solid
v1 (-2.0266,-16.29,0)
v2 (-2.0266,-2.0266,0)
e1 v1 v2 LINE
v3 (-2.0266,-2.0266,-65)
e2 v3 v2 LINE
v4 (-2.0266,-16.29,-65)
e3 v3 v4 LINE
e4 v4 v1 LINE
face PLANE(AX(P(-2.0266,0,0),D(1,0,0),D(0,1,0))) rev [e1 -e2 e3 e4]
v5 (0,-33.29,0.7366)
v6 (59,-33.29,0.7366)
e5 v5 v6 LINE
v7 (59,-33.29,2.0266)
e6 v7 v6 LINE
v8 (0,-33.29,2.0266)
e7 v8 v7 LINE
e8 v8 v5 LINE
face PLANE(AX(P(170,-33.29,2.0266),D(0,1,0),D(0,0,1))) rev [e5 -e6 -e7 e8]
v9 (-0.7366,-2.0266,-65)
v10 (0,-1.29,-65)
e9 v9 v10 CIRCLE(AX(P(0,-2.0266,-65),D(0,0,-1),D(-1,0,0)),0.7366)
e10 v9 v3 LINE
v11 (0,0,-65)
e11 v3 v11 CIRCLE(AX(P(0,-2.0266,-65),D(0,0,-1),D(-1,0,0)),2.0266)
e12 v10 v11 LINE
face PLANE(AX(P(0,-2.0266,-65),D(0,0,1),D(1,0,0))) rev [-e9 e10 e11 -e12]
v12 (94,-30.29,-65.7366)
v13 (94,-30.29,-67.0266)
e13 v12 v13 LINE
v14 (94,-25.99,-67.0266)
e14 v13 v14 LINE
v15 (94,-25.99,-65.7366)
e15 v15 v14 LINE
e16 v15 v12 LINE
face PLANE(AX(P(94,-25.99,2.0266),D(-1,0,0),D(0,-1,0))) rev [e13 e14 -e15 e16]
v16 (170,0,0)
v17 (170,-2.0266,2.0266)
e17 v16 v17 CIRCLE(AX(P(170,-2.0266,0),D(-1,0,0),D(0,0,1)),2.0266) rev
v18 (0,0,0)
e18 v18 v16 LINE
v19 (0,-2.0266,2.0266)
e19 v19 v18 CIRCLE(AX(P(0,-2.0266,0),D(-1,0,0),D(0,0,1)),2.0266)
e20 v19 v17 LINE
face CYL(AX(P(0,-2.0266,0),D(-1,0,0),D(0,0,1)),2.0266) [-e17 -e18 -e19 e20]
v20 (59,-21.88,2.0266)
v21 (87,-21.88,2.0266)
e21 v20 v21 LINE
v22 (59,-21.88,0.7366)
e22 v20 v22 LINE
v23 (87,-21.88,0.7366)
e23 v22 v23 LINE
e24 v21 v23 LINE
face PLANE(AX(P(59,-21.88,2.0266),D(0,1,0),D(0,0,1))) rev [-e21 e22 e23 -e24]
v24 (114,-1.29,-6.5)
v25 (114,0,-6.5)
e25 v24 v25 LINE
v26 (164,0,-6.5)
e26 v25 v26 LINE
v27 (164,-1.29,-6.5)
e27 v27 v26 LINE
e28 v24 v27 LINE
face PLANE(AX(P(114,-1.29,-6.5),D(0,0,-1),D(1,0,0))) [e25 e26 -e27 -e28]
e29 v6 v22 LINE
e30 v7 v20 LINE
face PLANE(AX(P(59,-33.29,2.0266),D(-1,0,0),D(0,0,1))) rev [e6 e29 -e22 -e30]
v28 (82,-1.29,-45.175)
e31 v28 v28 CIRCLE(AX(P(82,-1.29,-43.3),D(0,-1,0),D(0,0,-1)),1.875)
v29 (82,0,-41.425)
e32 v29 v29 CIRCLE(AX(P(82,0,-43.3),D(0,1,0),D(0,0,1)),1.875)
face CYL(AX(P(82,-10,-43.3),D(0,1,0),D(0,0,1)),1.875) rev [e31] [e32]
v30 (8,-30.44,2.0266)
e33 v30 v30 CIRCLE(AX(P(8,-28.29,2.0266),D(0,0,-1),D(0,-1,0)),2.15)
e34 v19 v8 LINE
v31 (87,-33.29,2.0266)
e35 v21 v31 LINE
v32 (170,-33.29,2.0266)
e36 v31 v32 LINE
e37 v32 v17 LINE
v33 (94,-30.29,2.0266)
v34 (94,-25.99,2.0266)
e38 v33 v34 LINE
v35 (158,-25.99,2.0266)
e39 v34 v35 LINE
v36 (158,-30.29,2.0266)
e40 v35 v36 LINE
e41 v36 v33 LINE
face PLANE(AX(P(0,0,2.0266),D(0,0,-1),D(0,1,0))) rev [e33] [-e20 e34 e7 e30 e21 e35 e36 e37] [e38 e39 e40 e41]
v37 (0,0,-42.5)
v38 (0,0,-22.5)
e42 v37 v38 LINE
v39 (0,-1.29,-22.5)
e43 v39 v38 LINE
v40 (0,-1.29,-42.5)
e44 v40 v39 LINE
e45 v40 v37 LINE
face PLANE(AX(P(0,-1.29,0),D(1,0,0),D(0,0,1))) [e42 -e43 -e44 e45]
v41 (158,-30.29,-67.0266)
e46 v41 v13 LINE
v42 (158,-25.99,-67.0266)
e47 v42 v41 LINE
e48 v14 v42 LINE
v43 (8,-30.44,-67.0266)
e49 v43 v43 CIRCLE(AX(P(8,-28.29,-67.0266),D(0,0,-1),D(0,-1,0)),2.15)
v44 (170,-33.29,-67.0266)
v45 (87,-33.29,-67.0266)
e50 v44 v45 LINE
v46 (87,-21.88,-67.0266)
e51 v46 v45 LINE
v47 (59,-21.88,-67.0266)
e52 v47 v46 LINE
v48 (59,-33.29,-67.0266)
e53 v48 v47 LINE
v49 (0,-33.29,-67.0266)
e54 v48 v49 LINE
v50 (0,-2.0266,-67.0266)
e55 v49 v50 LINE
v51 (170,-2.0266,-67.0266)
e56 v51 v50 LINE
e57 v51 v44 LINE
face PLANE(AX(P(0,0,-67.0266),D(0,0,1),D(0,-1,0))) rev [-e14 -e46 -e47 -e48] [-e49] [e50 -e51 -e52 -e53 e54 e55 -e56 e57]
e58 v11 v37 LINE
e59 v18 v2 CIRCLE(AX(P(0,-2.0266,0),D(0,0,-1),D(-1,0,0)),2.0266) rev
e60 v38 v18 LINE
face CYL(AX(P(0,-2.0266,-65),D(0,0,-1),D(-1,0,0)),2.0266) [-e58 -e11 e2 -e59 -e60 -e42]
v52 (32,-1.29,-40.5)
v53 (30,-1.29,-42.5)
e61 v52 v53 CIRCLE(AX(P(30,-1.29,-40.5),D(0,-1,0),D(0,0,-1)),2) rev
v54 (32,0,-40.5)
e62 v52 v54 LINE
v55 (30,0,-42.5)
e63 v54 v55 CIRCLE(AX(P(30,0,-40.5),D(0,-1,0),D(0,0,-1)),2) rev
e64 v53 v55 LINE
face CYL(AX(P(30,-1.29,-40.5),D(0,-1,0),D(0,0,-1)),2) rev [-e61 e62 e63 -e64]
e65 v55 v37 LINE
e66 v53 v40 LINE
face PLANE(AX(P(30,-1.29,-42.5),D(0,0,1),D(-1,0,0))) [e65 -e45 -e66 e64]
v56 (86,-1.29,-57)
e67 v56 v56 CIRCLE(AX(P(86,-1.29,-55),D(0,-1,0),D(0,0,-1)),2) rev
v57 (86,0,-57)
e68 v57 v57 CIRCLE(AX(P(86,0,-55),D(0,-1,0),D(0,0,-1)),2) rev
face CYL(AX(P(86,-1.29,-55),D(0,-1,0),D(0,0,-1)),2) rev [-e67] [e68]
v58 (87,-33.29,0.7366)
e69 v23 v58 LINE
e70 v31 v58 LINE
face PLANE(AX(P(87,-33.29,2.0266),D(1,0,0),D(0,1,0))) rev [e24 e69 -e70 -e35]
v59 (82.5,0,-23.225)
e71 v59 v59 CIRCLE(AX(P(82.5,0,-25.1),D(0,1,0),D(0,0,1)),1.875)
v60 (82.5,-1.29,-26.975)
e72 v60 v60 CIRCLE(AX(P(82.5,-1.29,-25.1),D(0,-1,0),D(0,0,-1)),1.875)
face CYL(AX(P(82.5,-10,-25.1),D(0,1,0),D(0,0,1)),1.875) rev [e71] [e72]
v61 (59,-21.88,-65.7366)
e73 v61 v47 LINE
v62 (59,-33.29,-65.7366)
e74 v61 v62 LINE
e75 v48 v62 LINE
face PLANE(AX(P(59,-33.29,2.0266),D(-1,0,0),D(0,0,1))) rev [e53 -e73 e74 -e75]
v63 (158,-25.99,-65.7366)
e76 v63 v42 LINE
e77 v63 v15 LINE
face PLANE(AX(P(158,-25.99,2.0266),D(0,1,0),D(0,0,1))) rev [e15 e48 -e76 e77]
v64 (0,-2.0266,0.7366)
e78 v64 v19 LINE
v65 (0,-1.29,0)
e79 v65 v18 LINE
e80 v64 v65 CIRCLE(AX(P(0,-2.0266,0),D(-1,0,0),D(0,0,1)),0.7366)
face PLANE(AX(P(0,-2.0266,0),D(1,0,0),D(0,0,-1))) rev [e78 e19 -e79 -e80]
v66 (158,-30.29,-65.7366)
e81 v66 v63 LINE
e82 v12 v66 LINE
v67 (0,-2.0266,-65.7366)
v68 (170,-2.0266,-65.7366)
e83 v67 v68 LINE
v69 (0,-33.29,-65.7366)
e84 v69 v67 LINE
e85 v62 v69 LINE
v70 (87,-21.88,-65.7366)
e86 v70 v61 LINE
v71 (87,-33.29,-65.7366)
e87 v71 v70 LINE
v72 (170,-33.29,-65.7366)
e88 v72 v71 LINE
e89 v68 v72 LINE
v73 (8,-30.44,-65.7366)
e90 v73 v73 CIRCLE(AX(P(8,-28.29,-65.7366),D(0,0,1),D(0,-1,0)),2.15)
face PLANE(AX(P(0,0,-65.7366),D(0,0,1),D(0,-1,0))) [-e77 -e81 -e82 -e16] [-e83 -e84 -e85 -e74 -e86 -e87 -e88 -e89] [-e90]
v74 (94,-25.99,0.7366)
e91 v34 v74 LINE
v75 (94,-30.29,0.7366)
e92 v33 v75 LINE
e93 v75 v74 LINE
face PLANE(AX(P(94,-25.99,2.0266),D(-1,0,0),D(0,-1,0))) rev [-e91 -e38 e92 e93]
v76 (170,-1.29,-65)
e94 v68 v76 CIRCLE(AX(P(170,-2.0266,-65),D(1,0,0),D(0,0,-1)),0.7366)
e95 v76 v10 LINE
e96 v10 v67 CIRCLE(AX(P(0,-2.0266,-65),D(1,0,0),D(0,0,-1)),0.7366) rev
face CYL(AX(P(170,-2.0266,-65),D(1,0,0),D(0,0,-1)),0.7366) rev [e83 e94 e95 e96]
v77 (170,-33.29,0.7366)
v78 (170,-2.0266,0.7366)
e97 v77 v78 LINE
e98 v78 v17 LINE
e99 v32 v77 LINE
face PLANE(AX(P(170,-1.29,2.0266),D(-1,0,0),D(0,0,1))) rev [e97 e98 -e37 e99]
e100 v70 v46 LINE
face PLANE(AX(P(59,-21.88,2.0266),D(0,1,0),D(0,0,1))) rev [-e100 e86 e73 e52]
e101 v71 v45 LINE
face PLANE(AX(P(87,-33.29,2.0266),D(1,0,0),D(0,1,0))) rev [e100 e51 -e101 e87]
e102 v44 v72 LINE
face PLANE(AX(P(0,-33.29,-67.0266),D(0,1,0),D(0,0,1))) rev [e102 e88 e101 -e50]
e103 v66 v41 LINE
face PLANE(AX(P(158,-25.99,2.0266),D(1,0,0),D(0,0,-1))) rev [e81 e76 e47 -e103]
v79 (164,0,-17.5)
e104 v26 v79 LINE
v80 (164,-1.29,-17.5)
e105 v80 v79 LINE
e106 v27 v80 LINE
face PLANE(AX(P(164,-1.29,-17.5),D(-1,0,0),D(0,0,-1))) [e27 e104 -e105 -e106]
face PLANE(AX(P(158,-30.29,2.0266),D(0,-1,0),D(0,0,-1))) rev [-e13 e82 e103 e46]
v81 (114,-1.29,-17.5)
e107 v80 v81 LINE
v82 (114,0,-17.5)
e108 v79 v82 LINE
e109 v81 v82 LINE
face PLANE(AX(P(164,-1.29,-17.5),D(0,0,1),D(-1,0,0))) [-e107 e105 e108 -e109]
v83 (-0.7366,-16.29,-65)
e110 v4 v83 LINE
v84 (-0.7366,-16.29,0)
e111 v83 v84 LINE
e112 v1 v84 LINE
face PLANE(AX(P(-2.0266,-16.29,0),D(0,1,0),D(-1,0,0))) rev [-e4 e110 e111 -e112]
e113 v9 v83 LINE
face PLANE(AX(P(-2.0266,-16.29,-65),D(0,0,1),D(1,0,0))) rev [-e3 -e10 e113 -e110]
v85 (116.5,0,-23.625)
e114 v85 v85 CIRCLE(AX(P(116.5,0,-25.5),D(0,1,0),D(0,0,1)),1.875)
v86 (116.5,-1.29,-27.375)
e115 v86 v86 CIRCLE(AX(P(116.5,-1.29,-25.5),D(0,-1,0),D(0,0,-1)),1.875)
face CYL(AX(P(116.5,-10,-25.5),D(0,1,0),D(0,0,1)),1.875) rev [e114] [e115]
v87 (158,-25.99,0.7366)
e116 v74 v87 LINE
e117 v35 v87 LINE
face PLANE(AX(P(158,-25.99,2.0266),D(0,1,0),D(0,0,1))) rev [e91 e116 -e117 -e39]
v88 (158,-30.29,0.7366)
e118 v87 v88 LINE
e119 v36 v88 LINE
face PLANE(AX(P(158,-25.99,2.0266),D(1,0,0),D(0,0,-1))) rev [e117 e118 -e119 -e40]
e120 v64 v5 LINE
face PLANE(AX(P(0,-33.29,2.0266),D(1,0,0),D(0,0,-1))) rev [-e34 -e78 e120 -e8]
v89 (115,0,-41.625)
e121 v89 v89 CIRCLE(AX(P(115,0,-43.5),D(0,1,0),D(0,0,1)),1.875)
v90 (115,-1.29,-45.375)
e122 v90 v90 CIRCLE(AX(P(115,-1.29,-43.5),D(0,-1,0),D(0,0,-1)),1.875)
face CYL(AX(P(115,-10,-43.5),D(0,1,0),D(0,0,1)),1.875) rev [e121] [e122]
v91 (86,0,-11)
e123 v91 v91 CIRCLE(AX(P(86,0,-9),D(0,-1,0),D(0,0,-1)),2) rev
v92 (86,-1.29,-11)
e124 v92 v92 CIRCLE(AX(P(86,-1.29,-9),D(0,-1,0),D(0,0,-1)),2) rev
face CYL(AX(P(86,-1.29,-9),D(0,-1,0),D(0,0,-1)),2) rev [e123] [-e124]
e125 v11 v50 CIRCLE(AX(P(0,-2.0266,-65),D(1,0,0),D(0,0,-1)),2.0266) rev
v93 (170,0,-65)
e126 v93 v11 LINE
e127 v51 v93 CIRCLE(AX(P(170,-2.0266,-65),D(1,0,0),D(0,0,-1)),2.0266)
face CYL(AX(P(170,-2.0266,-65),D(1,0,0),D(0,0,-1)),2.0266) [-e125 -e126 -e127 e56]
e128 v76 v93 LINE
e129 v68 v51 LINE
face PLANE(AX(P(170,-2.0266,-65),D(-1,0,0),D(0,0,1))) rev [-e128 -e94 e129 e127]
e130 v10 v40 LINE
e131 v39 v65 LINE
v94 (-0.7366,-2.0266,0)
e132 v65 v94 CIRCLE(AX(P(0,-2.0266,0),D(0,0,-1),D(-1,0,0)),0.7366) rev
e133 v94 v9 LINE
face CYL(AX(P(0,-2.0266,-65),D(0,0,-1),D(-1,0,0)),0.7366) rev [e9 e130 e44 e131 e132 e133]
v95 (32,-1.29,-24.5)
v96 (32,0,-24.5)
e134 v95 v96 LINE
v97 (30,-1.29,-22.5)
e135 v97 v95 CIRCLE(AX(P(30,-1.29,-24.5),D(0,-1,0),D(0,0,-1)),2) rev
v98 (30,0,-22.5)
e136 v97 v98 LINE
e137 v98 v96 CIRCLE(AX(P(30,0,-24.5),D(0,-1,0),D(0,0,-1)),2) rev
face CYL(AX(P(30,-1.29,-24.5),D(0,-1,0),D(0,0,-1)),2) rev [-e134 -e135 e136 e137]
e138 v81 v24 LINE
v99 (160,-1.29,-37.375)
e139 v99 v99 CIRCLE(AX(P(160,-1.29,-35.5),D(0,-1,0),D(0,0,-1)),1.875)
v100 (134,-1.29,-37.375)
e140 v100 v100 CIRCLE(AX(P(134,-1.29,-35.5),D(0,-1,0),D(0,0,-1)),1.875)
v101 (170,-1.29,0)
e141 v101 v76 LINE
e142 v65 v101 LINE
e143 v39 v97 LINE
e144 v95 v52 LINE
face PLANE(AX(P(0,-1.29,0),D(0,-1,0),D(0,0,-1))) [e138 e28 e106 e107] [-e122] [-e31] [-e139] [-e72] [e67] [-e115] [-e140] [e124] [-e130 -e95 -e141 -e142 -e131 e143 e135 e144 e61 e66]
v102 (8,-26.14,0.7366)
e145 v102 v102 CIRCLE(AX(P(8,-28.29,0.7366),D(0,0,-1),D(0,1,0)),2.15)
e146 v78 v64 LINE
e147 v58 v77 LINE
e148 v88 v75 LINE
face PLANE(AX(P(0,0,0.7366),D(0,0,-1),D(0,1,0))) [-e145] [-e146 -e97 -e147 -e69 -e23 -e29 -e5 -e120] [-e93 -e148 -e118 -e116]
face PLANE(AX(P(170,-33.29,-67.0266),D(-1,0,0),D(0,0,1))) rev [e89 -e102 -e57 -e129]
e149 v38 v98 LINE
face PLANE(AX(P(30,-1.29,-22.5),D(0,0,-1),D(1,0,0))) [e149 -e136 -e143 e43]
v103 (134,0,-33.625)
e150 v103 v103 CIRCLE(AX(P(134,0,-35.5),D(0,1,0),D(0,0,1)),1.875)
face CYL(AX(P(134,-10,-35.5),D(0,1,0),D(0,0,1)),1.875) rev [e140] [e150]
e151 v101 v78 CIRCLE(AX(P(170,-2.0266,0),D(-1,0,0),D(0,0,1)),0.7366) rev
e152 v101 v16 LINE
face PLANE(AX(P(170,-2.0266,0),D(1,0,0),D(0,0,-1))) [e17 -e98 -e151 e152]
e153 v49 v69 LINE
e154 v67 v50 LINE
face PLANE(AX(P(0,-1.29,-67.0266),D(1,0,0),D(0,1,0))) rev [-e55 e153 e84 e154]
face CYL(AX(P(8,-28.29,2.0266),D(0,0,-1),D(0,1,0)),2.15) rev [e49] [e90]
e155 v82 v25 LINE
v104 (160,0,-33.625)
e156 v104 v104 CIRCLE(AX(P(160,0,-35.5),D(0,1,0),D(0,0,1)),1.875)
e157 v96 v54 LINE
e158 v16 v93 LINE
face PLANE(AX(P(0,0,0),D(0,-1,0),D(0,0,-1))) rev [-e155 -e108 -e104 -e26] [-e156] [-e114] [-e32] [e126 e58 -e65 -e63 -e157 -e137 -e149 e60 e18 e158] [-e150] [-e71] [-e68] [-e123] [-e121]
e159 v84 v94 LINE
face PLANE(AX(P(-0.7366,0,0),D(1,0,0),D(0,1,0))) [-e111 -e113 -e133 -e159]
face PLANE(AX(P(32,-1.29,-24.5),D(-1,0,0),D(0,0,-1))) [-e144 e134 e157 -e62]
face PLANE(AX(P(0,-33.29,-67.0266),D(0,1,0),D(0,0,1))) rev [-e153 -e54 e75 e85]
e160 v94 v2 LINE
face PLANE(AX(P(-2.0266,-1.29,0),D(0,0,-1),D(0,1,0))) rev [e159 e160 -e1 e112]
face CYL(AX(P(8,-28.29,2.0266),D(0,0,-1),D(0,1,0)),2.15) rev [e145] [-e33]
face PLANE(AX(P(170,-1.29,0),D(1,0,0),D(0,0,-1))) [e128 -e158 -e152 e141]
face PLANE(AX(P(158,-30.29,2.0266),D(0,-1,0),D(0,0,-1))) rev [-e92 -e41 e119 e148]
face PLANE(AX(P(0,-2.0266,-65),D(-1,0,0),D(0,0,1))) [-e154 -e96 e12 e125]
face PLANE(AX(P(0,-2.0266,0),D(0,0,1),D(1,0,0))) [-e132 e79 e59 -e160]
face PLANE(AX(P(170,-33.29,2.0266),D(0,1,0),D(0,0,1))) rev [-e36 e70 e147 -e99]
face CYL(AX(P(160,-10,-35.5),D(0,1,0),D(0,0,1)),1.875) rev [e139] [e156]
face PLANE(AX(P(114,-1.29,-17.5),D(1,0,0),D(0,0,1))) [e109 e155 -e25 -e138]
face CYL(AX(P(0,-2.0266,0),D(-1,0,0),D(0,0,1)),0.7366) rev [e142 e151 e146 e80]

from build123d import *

# Parameters (mm, degrees)
SKETCH1_W          = 170
SKETCH1_H          = 65
BASE_FLANGE1_DEPTH = 1.29
EDGE_FLANGE1_DEPTH = 170
EDGE_FLANGE3_DEPTH = 65
CUT_EXTRUDE1_REACH = 187.022
SKETCH16_R         = 2
SKETCH16_W         = 50
SKETCH16_H         = 11
EDGE_FLANGE7_DEPTH = 170
SKETCH34_R         = 2.15
SKETCH34_W         = 28
SKETCH34_H         = 11.41
SKETCH34_W_2       = 64
SKETCH34_H_2       = 4.3
CUT_EXTRUDE5_DEPTH = 187.484767556
SKETCH36_R         = 1.875
CUT_EXTRUDE6_DEPTH = 10
SKETCH37_R         = 1.875
CUT_EXTRUDE7_DEPTH = 10


# Sheet-metal steps are written as plain solids
with BuildPart() as part:
    # Sketch1 → Base-Flange1 (new body)
    with BuildSketch(Plane(origin=(0, 0, 0), x_dir=(1, 0, 0), z_dir=(0, 1, 0))):
        with Locations((85, 32.5)):
            Rectangle(SKETCH1_W, SKETCH1_H)
    extrude(amount=-BASE_FLANGE1_DEPTH)

    # Edge-Flange1 section (across the edge) → Edge-Flange1 (add)
    with BuildSketch(Plane(origin=(170, -1.29, 0.7366), x_dir=(0, 0, -1), z_dir=(-1, 0, 0))):
        with BuildLine():
            Line((-1.29, 0.7366), (-1.29, 32))
            Line((-1.29, 32), (0, 32))
            Line((0, 32), (0, 0.7366))
            ThreePointArc((0, 0.7366), (0.215745145, 0.215745145), (0.7366, 0))
            Line((0.7366, 0), (0.7366, -1.29))
            ThreePointArc((0.7366, -1.29), (-0.696422603, -0.696422603), (-1.29, 0.7366))
        make_face()
    extrude(amount=EDGE_FLANGE1_DEPTH)

    # Edge-Flange3 section (across the edge) → Edge-Flange3 (add)
    with BuildSketch(Plane(origin=(-0.7366, -1.29, 0), x_dir=(1, 0, 0), z_dir=(0, 0, -1))):
        with BuildLine():
            Line((-1.29, 0.7366), (-1.29, 15))
            Line((-1.29, 15), (0, 15))
            Line((0, 15), (0, 0.7366))
            ThreePointArc((0, 0.7366), (0.215745145, 0.215745145), (0.7366, 0))
            Line((0.7366, 0), (0.7366, -1.29))
            ThreePointArc((0.7366, -1.29), (-0.696422603, -0.696422603), (-1.29, 0.7366))
        make_face()
    extrude(amount=EDGE_FLANGE3_DEPTH)

    # Sketch16 → Cut-Extrude1 (cut, up to next)
    with BuildSketch(Plane(origin=(0, 0, 0), x_dir=(1, 0, 0), z_dir=(0, 1, 0)), mode=Mode.PRIVATE) as cut_extrude1_sk1:
        with Locations(Location((86, 9, 0), (0, 0, 90))):
            Circle(SKETCH16_R)
    cut_extrude1_tool1 = extrude(cut_extrude1_sk1.sketch, amount=-CUT_EXTRUDE1_REACH, mode=Mode.PRIVATE) & part.part
    # Sketch16 → Cut-Extrude1 (cut, up to next)
    with BuildSketch(Plane(origin=(0, 0, 0), x_dir=(1, 0, 0), z_dir=(0, 1, 0)), mode=Mode.PRIVATE) as cut_extrude1_sk2:
        with Locations(Location((86, 55, 0), (0, 0, 90))):
            Circle(SKETCH16_R)
    cut_extrude1_tool2 = extrude(cut_extrude1_sk2.sketch, amount=-CUT_EXTRUDE1_REACH, mode=Mode.PRIVATE) & part.part
    # Sketch16 → Cut-Extrude1 (cut, up to next)
    with BuildSketch(Plane(origin=(0, 0, 0), x_dir=(1, 0, 0), z_dir=(0, 1, 0)), mode=Mode.PRIVATE) as cut_extrude1_sk3:
        with Locations((139, 12)):
            Rectangle(SKETCH16_W, SKETCH16_H)
    cut_extrude1_tool3 = extrude(cut_extrude1_sk3.sketch, amount=-CUT_EXTRUDE1_REACH, mode=Mode.PRIVATE) & part.part
    # Sketch16 → Cut-Extrude1 (cut, up to next)
    with BuildSketch(Plane(origin=(0, 0, 0), x_dir=(1, 0, 0), z_dir=(0, 1, 0)), mode=Mode.PRIVATE) as cut_extrude1_sk4:
        with BuildLine():
            Line((30, 42.5), (0, 42.5))
            Line((0, 42.5), (0, 22.5))
            Line((0, 22.5), (30, 22.5))
            ThreePointArc((30, 22.5), (31.414213562, 23.085786438), (32, 24.5))
            Line((32, 24.5), (32, 40.5))
            ThreePointArc((32, 40.5), (31.414213562, 41.914213562), (30, 42.5))
        make_face()
    cut_extrude1_tool4 = extrude(cut_extrude1_sk4.sketch, amount=-CUT_EXTRUDE1_REACH, mode=Mode.PRIVATE) & part.part
    add(cut_extrude1_tool1.solids().sort_by_distance((86, 0, -9))[0], mode=Mode.SUBTRACT)
    add(cut_extrude1_tool2.solids().sort_by_distance((86, 0, -55))[0], mode=Mode.SUBTRACT)
    add(cut_extrude1_tool3.solids().sort_by_distance((139, 0, -12))[0], mode=Mode.SUBTRACT)
    add(cut_extrude1_tool4.solids().sort_by_distance((15.958166, 0, -32.5))[0], mode=Mode.SUBTRACT)

    # Edge-Flange7 section (across the edge) → Edge-Flange7 (add)
    with BuildSketch(Plane(origin=(0, -1.29, -65.7366), x_dir=(0, 0, 1), z_dir=(1, 0, 0))):
        with BuildLine():
            Line((-1.29, 0.7366), (-1.29, 32))
            Line((-1.29, 32), (0, 32))
            Line((0, 32), (0, 0.7366))
            ThreePointArc((0, 0.7366), (0.215745145, 0.215745145), (0.7366, 0))
            Line((0.7366, 0), (0.7366, -1.29))
            ThreePointArc((0.7366, -1.29), (-0.696422603, -0.696422603), (-1.29, 0.7366))
        make_face()
    extrude(amount=EDGE_FLANGE7_DEPTH)

    # Sketch34 → Cut-Extrude5 (cut, through all)
    with BuildSketch(Plane(origin=(0, 0, -67.0266), x_dir=(-1, 0, 0), z_dir=(0, 0, -1))):
        with Locations(Location((-8, -28.29, 0), (0, 0, 270))):
            Circle(SKETCH34_R)
        with Locations((-73, -27.585)):
            Rectangle(SKETCH34_W, SKETCH34_H)
        with Locations((-126, -28.14)):
            Rectangle(SKETCH34_W_2, SKETCH34_H_2)
    extrude(amount=-CUT_EXTRUDE5_DEPTH, mode=Mode.SUBTRACT)

    # Sketch36 → Cut-Extrude6 (cut)
    with BuildSketch(Plane(origin=(0, 0, 0), x_dir=(1, 0, 0), z_dir=(0, 1, 0))):
        with Locations(Location((116.5, 25.5, 0), (0, 0, 270))):
            Circle(SKETCH36_R)
        with Locations(Location((115, 43.5, 0), (0, 0, 270))):
            Circle(SKETCH36_R)
        with Locations(Location((82.5, 25.1, 0), (0, 0, 270))):
            Circle(SKETCH36_R)
        with Locations(Location((82, 43.3, 0), (0, 0, 270))):
            Circle(SKETCH36_R)
    extrude(amount=-CUT_EXTRUDE6_DEPTH, mode=Mode.SUBTRACT)

    # Sketch37 → Cut-Extrude7 (cut)
    with BuildSketch(Plane(origin=(0, 0, 0), x_dir=(1, 0, 0), z_dir=(0, 1, 0))):
        with Locations(Location((160, 35.5, 0), (0, 0, 270))):
            Circle(SKETCH37_R)
        with Locations(Location((134, 35.5, 0), (0, 0, 270))):
            Circle(SKETCH37_R)
    extrude(amount=-CUT_EXTRUDE7_DEPTH, mode=Mode.SUBTRACT)


solid = part.part
